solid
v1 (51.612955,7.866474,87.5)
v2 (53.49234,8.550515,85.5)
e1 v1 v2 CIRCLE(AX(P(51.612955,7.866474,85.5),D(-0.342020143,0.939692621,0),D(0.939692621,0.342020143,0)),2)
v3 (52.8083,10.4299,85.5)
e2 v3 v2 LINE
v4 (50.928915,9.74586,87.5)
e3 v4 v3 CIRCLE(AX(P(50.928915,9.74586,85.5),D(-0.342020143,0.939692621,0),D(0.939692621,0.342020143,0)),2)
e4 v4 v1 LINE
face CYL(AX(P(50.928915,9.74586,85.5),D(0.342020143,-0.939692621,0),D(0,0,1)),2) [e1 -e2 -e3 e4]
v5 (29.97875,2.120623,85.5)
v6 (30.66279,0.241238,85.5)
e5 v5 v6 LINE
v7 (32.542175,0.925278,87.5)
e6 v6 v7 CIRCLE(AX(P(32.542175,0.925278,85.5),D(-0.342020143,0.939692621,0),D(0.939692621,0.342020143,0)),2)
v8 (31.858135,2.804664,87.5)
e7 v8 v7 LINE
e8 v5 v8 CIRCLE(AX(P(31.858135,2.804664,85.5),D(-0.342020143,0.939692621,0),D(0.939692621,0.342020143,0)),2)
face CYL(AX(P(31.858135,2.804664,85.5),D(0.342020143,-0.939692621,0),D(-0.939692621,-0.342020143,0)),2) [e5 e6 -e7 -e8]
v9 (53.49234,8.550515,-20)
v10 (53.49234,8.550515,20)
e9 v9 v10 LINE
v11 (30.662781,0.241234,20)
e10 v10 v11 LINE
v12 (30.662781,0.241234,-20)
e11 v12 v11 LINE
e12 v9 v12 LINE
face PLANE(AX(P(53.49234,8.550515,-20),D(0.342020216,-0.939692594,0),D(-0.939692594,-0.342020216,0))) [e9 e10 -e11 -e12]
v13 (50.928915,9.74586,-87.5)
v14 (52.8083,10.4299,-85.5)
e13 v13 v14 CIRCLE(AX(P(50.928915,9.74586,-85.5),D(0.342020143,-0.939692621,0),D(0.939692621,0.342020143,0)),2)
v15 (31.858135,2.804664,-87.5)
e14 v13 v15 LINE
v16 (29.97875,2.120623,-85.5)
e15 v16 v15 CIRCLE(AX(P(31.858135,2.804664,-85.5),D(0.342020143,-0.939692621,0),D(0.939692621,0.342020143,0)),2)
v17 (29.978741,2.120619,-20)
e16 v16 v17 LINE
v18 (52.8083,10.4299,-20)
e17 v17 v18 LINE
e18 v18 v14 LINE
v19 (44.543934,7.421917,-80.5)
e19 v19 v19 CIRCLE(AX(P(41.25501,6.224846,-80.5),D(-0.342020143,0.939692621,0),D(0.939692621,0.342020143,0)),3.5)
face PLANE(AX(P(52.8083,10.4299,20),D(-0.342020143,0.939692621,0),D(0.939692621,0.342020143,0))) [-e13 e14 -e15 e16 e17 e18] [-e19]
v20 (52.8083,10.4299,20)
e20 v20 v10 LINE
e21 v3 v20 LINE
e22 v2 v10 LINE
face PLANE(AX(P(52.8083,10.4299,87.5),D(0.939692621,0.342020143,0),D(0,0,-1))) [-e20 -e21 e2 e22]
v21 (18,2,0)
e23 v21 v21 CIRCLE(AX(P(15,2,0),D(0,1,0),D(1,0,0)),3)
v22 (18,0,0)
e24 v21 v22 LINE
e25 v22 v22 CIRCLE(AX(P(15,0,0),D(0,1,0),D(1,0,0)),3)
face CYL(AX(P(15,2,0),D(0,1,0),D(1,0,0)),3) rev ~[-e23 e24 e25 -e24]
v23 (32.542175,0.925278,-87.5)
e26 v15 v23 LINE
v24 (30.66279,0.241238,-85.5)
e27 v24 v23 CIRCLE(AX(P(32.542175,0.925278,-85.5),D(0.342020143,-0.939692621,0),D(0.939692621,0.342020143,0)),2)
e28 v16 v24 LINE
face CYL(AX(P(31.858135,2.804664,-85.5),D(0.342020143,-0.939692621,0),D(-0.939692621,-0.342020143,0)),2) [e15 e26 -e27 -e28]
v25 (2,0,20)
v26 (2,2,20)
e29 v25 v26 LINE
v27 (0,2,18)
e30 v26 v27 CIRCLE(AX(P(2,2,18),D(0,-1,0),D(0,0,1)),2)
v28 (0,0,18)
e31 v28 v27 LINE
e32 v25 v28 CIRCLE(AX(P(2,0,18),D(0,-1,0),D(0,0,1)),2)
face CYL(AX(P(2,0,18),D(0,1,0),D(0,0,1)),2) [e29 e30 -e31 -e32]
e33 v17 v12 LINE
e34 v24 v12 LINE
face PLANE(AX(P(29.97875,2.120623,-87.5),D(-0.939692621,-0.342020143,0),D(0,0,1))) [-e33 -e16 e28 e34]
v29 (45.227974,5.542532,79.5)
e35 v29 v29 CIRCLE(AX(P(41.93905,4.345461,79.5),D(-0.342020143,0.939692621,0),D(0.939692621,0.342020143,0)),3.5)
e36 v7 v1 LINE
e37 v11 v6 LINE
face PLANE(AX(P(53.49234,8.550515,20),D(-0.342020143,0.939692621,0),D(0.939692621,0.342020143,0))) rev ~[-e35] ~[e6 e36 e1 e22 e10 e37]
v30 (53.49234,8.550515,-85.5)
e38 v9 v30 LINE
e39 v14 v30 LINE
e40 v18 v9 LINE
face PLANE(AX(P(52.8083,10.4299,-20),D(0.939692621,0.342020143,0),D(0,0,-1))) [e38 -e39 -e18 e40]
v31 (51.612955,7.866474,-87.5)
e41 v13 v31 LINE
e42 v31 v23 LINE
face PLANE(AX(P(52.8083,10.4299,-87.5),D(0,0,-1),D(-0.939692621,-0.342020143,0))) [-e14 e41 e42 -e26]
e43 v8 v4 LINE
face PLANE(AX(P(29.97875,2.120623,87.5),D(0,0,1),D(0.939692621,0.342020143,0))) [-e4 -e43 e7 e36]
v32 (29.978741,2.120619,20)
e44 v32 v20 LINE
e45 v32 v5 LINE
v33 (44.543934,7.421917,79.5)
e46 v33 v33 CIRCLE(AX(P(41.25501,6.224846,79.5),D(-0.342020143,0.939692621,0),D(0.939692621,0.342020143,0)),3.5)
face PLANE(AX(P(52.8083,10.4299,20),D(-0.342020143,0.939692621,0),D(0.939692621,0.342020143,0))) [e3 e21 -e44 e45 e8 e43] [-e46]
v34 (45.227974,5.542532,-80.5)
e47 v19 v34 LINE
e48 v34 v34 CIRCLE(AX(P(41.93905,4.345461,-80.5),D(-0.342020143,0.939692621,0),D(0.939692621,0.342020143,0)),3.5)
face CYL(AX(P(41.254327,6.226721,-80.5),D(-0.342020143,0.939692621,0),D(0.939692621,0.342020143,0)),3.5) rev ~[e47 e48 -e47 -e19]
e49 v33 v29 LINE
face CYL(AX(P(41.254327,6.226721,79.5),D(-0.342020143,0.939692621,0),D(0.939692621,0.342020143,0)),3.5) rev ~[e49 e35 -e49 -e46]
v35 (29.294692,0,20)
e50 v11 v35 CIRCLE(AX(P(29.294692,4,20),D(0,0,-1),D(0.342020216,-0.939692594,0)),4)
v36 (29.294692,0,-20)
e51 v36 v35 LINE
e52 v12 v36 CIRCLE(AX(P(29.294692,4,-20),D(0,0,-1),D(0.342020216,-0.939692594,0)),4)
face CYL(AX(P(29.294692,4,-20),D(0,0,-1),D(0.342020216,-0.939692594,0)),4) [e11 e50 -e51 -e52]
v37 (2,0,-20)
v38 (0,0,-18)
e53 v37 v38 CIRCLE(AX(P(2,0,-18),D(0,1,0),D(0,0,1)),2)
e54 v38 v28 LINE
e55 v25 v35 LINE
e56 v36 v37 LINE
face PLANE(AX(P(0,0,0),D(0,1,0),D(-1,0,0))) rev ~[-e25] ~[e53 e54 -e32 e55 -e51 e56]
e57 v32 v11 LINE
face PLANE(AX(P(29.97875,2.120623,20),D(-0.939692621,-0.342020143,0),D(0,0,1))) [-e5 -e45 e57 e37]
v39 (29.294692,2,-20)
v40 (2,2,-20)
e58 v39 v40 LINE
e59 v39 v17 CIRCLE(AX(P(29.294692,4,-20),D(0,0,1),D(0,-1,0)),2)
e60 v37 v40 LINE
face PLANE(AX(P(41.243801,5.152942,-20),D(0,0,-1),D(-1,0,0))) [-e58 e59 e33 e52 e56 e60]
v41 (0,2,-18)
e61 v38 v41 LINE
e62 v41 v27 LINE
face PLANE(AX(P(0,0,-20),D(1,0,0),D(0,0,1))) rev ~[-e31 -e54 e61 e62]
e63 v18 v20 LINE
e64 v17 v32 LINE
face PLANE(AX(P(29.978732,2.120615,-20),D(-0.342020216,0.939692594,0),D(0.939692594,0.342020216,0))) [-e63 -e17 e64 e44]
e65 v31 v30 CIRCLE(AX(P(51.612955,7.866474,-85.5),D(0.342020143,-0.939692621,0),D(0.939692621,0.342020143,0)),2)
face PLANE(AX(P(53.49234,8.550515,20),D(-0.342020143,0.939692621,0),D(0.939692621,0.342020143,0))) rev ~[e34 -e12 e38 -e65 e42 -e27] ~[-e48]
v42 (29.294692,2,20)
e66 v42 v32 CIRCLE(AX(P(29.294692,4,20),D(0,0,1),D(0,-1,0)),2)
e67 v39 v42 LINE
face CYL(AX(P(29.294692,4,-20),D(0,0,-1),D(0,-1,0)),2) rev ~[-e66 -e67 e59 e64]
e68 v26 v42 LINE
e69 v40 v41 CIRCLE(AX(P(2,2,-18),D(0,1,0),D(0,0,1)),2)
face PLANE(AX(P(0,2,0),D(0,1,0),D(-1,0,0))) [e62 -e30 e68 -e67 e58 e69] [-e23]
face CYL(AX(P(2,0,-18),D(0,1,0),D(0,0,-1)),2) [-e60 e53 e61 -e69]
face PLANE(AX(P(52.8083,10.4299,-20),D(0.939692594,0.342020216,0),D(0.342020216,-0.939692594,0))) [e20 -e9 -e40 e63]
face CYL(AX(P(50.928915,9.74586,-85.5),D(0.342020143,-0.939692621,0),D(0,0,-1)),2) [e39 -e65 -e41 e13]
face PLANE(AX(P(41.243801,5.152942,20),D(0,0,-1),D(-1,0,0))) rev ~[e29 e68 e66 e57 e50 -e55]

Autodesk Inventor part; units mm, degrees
ref_plane "YZ Plane" through (0, 0, 0) normal (1, 0, 0) x (0, 1, 0)
ref_plane "XZ Plane" through (0, 0, 0) normal (0, 1, 0) x (-1, 0, 0)
ref_plane "XY Plane" through (0, 0, 0) normal (0, 0, 1) x (1, 0, 0)
sketch "Sketch1" plane through (0, 0, 0) normal (0, 1, 0) x (-1, 0, 0)
  line L0 (0, 20) -> (-30, 20)
  line L1 (-30, 20) -> (-30, -20)
  line L2 (-30, -20) -> (0, -20)
  line L3 (0, -20) -> (0, 20)
  point P0 (0, 0)
  dimension "d0" = 20
  dimension "d1" = 20
  dimension "d2" = 0
  dimension "d3" = 30
extrude "Plate1" add sketch "Sketch1" along normal blind 2
sketch "Sketch3" plane through (29.316, 1.8794, -20) normal (0.3420201, -0.9396926, 0) x (0.9396926, 0.3420201, 0)
  line L0 (0, 40) -> (0, 0)
  line L1 (0, 0) -> (25, 0)
  line L2 (25, 0) -> (25, 40)
  line L3 (25, 40) -> (0, 40)
edge flange "Flange1" height 25 angle 20 thickness 2 bend radius 2 thickness toward (0.3420201, -0.9396926, 0) relief tear relief width 2 relief depth 1 edges at (30, 2, 0) wall of the first edge with corners at (29.316, 1.8794, 20) (29.316, 1.8794, -20) (52.8083, 10.4299, -20) (52.8083, 10.4299, 20)
bend "Bend1"
corner "Corner1"
sketch "Sketch4" plane through (52.8083, 10.4299, 20) normal (-0.3420201, 0.9396926, 0) x (0.9396926, 0.3420201, 0)
  line L0 (-24.2947, 40) -> (-24.2947, 0) projected
  line L1 (-24.2947, 0) -> (0, 0) projected
  line L2 (0, 0) -> (0, 40) projected
  line L3 (-24.2947, 40) -> (0, 40) projected
  line L4 (-24.2947, -67.5) -> (0, -67.5)
  line L5 (0, -67.5) -> (0, 107.5)
  line L6 (0, 107.5) -> (-24.2947, 107.5)
  line L7 (-24.2947, 107.5) -> (-24.2947, -67.5)
  point P0 (-53.1908, 20)
  dimension "d19" = 67.5
  dimension "d20" = 67.5
  dimension "d21" = 0
  dimension "d22" = 0
extrude "Extrusion1" add sketch "Sketch4" against normal blind 2 contours L7 L6 L5 L3 | L1 L5 L4 L7
fillet "Fillet1" radius 2 2 edges at (0, 1, 20) (0, 1, -20)
fillet "Fillet2" radius 2 4 edges at (30.3208, 1.1809, 87.5) (53.1503, 9.4902, 87.5) (53.1503, 9.4902, -87.5) (30.3208, 1.1809, -87.5)
sketch "Sketch5" plane through (0, 2, 0) normal (0, 1, 0) x (1, 0, 0)
  circle A0 centre (15, 0) radius 3
  point P0 (0, 0)
  dimension "d44" = 6
  dimension "d45" = 15
  dimension "d46" = 0
extrude "Extrusion2" cut sketch "Sketch5" against normal blind 2
sketch "Sketch6" plane through (29.9787, 2.1206, 20) normal (-0.3420201, 0.9396926, 0) x (0.9396926, 0.3420201, 0)
  circle A0 centre (12, -59.5) radius 3.5
  arc A1 (2, 107.5) -> (0, 105.5) centre (2, 105.5) ccw projected
  line L0 (0, 105.5) -> (0, 40) projected
  line L1 (0, 40) -> (0, 0) projected
  line L2 (0, 0) -> (0, -65.5) projected
  arc A2 (0, -65.5) -> (2, -67.5) centre (2, -65.5) ccw projected
  line L3 (2, -67.5) -> (22.2947, -67.5) projected
  arc A3 (22.2947, -67.5) -> (24.2947, -65.5) centre (22.2947, -65.5) ccw projected
  line L4 (24.2947, -65.5) -> (24.2947, 105.5) projected
  arc A4 (24.2947, 105.5) -> (22.2947, 107.5) centre (22.2947, 105.5) ccw projected
  line L5 (22.2947, 107.5) -> (2, 107.5) projected
  circle A5 centre (12, 100.5) radius 3.5
  point P0 (-28.8961, 20)
  dimension "d32" = 7
  dimension "d35" = 160
  dimension "d40" = 8
  dimension "d41" = 12
extrude "Extrusion3" cut sketch "Sketch6" against normal blind 2 contours A0 | A5
equation "\"d20\" = d19"
equation "\"d1\" = d0"
equation "\"BendRadius\" = Thickness"
equation "\"BendReliefWidth\" = Thickness"
equation "\"BendReliefDepth\" = 0.5 * Thickness"
equation "\"CornerReliefSize\" = 4 * Thickness"
equation "\"MinimumRemnant\" = 2 * Thickness"
equation "\"TransitionRadius\" = BendRadius"
equation "\"JacobiRadiusSize\" = BendRadius"
equation "\"GapSize\" = Thickness"
properties part number "Top Mount" material "Stainless Steel"
